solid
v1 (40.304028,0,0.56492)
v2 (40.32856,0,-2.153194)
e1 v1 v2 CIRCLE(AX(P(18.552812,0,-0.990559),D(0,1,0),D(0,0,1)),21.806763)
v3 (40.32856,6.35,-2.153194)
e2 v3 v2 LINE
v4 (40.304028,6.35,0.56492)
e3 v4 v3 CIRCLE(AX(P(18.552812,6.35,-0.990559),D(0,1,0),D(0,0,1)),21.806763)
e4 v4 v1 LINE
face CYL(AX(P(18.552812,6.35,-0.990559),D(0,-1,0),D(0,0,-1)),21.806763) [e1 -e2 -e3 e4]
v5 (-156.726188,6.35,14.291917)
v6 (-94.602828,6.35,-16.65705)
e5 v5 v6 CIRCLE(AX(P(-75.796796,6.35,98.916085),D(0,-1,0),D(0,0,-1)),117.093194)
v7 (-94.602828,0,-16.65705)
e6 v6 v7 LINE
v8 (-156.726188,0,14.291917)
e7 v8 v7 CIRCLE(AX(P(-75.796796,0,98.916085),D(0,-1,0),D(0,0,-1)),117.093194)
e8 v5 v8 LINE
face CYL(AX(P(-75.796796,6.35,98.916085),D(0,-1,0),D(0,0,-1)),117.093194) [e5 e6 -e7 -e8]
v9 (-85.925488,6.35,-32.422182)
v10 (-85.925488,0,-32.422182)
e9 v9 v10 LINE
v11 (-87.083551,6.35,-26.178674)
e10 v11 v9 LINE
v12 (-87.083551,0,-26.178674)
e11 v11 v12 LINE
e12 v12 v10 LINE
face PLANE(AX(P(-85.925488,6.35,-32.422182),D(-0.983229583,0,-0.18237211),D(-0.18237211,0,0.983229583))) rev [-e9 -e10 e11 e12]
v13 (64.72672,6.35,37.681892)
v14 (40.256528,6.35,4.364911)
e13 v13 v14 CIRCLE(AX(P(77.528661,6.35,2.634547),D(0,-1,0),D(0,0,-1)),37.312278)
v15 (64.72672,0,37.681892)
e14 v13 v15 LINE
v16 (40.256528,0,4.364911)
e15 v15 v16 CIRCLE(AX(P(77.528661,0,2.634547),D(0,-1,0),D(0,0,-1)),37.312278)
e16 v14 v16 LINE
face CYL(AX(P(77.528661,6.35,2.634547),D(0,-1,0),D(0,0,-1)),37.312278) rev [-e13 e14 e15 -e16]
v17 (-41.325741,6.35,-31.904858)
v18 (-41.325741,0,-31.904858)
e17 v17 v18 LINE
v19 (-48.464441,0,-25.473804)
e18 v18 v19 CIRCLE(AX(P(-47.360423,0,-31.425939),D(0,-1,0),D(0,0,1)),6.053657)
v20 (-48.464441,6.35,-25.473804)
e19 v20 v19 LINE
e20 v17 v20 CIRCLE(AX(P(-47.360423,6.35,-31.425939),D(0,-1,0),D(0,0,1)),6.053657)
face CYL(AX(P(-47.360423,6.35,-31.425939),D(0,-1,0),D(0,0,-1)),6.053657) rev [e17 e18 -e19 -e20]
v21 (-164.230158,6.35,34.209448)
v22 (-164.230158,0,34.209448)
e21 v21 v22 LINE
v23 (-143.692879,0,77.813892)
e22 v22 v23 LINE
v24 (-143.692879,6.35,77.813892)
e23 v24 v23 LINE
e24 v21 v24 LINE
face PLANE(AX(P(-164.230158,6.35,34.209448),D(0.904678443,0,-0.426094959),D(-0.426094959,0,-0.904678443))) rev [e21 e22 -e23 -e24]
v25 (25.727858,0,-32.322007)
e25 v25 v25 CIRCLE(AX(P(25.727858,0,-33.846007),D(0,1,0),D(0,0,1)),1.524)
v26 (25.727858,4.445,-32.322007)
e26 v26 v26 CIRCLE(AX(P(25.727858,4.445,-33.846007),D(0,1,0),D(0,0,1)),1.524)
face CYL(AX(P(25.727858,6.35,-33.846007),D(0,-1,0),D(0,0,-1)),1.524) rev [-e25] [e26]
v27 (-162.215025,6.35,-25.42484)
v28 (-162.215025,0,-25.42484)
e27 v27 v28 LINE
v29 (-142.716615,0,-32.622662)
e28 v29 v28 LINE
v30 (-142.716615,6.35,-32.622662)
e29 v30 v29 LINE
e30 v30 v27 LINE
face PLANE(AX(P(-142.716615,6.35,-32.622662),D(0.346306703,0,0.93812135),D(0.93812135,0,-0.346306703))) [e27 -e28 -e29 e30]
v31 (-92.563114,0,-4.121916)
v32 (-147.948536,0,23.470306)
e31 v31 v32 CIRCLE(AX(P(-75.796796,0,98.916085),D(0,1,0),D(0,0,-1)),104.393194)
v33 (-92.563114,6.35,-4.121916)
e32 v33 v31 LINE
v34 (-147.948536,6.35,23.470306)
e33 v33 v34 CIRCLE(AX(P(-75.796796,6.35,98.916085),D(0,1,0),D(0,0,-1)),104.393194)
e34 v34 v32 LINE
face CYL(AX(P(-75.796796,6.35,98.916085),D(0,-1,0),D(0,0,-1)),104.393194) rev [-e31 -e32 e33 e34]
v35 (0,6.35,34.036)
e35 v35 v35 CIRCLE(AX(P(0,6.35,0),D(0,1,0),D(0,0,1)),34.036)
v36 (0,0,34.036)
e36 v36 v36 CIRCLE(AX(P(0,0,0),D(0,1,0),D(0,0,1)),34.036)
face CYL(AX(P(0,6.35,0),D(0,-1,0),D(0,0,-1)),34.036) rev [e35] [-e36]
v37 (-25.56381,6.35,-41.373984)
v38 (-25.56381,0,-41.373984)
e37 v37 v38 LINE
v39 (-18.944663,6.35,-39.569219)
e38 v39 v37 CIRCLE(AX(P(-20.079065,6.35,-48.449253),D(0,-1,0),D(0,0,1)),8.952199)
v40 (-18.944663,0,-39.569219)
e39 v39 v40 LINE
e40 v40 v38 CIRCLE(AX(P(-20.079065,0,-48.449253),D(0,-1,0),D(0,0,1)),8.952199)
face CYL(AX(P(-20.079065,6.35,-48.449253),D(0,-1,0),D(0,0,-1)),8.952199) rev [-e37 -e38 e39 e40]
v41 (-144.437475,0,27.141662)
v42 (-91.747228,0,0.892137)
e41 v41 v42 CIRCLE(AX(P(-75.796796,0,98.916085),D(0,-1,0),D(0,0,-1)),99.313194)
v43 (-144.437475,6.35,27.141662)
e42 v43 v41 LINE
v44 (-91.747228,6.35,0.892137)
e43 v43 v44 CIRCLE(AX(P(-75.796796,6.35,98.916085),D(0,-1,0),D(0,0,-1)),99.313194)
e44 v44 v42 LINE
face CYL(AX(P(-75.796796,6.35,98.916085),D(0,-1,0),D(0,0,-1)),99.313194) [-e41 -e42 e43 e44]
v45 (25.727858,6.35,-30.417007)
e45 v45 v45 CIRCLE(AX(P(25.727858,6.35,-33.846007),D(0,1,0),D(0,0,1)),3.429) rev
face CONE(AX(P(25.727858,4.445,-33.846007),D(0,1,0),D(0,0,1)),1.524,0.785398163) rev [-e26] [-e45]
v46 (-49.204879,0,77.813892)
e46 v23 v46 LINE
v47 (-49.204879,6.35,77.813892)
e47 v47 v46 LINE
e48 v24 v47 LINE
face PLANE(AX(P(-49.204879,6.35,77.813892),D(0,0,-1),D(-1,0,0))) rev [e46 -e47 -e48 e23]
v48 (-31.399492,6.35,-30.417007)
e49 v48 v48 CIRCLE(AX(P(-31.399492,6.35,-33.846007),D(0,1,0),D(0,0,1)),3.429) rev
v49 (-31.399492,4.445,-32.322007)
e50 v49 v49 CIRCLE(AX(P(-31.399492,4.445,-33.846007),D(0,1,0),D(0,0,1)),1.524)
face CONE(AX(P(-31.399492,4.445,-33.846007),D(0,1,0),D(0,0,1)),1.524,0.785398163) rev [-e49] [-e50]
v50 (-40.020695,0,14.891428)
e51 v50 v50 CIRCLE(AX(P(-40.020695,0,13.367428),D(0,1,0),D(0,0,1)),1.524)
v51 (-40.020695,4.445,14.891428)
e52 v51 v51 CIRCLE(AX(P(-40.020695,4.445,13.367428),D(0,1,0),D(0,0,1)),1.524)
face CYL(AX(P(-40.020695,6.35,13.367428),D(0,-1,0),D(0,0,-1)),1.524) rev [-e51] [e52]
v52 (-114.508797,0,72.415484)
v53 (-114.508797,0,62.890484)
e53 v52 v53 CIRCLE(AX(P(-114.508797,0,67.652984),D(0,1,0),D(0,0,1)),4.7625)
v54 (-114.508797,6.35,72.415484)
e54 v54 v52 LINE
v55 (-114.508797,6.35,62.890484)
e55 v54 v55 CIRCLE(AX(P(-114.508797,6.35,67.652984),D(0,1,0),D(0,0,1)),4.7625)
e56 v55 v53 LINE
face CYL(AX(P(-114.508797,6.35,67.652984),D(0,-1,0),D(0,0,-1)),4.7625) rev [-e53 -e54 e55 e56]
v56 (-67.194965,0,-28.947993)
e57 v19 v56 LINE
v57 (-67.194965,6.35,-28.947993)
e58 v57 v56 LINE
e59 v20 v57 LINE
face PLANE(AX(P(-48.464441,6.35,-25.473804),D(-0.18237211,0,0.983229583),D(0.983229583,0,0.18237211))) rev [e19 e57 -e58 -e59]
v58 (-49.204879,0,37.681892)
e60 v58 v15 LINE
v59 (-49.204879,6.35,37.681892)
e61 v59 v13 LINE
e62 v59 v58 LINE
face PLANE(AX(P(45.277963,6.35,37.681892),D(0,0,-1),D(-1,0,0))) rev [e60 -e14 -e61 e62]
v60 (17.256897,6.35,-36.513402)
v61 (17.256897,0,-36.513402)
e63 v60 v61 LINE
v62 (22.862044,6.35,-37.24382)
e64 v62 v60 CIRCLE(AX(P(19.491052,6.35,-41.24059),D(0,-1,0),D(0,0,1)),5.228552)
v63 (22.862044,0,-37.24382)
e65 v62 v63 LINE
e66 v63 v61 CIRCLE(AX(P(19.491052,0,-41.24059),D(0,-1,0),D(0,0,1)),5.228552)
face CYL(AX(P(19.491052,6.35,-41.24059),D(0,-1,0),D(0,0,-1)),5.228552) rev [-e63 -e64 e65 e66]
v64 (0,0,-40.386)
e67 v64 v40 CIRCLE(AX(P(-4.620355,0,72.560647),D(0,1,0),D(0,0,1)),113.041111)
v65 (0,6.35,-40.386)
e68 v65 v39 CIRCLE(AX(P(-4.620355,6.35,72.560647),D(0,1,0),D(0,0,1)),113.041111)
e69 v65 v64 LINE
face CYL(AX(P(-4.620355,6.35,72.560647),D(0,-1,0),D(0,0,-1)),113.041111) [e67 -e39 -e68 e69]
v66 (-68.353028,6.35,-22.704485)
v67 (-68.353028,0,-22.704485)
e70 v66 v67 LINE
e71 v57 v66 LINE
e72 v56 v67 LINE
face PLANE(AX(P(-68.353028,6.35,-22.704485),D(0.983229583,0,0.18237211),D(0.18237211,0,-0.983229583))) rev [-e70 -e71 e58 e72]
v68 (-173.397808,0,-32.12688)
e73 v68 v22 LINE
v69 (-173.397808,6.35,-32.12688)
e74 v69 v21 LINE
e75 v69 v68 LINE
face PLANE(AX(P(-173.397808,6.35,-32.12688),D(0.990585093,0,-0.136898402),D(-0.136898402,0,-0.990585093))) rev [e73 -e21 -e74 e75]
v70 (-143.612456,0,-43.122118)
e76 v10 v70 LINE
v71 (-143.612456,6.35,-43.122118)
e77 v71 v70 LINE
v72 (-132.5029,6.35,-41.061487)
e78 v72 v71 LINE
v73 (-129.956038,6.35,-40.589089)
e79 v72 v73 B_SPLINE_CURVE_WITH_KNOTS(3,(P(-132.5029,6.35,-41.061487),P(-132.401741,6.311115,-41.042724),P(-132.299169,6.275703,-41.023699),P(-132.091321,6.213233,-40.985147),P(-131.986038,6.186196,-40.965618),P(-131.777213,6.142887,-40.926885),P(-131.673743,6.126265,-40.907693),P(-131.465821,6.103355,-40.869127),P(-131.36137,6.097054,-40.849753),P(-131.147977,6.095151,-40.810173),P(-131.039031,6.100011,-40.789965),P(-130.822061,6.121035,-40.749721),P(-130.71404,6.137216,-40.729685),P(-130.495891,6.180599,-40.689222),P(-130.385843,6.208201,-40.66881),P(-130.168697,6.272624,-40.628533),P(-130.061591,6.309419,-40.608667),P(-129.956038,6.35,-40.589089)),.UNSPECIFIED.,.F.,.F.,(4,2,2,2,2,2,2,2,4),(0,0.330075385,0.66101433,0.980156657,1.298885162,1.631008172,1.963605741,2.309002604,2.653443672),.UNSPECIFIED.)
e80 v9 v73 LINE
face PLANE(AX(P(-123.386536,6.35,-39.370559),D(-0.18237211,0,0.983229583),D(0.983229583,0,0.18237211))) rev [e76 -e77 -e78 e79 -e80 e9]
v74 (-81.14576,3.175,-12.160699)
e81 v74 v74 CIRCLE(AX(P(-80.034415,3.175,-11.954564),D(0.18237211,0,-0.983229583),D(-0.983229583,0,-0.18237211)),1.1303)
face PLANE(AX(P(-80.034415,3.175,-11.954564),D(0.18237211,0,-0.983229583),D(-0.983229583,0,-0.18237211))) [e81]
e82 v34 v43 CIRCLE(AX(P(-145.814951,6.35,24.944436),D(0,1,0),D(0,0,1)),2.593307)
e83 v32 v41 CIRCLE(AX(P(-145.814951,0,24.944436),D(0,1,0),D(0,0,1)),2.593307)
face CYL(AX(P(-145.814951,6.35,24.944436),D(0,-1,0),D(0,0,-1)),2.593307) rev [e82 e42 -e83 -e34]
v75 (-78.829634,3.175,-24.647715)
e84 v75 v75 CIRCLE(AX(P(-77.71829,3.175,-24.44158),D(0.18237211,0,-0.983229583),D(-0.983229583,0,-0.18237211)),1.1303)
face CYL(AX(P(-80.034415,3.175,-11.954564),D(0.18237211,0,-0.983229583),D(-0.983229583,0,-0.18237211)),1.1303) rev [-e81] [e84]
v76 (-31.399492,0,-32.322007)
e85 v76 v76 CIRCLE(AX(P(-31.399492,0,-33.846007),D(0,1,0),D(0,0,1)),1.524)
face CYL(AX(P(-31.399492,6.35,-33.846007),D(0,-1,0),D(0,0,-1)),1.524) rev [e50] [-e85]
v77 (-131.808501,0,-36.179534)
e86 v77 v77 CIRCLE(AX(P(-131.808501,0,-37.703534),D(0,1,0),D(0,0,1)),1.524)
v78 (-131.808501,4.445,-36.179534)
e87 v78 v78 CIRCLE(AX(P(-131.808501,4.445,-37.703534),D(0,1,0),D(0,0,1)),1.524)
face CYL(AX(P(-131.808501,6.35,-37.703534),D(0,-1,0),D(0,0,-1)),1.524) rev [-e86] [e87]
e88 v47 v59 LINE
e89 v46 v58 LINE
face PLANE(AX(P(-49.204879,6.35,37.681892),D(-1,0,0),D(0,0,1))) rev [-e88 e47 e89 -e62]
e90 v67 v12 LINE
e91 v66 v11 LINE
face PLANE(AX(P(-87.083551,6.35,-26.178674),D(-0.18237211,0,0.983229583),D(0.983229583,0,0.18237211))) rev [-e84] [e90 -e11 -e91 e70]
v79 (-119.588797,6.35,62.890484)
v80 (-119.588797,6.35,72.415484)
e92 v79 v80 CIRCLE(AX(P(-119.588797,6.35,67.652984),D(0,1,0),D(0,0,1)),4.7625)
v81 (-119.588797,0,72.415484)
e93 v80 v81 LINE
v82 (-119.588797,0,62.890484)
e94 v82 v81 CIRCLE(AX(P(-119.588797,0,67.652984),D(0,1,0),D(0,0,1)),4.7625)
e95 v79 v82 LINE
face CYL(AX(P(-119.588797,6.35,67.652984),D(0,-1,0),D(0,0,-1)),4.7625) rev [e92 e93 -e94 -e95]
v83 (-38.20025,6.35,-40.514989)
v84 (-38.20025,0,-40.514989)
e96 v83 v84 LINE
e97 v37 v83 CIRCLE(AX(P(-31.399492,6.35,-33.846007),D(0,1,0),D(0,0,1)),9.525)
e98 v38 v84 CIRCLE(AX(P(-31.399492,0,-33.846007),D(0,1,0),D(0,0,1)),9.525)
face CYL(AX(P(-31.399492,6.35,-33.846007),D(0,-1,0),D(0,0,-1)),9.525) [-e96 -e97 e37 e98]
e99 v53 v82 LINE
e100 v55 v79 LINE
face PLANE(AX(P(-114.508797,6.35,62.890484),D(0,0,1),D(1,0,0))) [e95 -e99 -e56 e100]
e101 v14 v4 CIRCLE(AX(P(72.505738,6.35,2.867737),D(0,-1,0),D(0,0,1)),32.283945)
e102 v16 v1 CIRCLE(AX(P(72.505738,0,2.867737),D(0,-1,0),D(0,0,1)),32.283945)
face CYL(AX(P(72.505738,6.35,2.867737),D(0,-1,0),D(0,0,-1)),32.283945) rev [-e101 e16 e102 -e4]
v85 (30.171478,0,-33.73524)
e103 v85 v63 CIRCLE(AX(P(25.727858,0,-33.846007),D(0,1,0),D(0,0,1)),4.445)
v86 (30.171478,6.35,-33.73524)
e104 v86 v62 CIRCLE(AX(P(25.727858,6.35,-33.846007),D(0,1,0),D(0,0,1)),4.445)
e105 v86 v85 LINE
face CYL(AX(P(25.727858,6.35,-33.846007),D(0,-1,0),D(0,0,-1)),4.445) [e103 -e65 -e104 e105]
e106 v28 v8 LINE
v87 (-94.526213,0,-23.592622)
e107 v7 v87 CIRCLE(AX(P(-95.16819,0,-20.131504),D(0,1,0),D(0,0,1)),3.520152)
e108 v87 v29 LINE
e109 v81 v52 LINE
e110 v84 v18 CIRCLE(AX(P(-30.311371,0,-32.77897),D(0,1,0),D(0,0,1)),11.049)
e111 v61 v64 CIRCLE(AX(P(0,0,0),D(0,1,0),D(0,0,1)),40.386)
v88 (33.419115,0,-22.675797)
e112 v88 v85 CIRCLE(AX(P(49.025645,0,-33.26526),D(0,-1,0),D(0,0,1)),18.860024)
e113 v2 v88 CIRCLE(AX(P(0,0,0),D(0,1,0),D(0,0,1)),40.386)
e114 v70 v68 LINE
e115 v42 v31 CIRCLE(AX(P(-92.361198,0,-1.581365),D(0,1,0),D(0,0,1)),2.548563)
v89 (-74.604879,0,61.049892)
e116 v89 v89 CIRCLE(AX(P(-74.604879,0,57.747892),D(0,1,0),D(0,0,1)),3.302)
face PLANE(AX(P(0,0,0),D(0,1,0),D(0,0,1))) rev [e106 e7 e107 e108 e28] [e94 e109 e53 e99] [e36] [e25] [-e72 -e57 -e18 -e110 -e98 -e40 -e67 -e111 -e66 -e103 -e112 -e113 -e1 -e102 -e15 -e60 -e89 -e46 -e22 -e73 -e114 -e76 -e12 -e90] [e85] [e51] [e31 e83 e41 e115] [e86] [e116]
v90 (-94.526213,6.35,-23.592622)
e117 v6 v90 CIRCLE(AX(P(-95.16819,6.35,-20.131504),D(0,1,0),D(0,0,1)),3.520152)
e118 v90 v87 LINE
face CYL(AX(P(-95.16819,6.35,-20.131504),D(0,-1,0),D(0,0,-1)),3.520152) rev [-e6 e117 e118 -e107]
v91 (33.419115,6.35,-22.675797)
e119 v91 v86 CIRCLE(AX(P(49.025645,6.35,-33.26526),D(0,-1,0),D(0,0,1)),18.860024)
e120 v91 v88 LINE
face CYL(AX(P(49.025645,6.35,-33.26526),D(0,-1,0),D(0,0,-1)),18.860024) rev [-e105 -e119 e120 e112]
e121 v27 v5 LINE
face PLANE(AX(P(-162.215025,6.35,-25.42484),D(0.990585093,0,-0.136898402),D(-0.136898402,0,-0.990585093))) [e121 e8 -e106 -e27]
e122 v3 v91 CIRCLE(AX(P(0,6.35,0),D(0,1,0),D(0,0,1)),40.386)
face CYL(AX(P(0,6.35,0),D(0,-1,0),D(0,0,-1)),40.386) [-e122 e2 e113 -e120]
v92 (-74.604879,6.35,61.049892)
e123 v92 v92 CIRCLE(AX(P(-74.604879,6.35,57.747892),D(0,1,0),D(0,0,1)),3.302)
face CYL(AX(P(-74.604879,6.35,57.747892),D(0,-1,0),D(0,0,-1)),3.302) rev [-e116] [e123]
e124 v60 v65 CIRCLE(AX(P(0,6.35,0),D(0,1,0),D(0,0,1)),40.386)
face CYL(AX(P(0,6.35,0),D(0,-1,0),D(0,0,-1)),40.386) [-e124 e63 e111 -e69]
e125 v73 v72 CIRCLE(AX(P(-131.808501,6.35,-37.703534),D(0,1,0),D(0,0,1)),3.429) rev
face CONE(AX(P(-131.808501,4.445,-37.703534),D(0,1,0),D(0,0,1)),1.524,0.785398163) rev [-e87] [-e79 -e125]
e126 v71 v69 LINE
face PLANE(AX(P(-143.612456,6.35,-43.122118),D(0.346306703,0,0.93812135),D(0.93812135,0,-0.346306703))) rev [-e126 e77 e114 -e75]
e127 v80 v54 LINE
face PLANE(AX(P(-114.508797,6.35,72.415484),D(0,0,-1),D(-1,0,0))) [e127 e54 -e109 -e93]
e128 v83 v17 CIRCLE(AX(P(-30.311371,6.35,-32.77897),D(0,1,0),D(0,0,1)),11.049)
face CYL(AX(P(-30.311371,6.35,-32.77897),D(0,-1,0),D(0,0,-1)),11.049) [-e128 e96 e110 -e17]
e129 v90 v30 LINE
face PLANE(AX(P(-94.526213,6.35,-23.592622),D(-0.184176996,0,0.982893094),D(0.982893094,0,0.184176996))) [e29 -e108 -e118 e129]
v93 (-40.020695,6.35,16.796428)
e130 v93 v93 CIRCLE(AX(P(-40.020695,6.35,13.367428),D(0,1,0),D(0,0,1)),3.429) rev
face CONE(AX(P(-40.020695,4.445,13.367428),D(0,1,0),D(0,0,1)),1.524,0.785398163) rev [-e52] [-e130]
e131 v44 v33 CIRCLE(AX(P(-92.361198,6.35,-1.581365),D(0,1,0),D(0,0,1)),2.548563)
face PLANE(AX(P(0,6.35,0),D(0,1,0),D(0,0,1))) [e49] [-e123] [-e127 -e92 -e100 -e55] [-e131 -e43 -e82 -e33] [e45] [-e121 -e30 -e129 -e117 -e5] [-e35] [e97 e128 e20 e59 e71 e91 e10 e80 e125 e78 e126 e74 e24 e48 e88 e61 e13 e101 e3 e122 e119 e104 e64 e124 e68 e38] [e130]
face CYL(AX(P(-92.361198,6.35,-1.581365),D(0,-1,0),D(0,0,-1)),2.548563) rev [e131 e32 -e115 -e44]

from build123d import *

# Parameters (mm, degrees)
SKETCH1_R           = 34.036
SKETCH1_R_2         = 1.524
SKETCH1_R_3         = 3.302
BOSS_EXTRUDE1_DEPTH = 6.35
CHAMFER1_SIZE       = 1.905
SKETCH2_R           = 1.1303
CUT_EXTRUDE1_DEPTH  = 12.7


with BuildPart() as part:
    # Sketch1 → Boss-Extrude1 (new body)
    with BuildSketch(Plane(origin=(0, 0, 0), x_dir=(1, 0, 0), z_dir=(0, 1, 0))):
        with BuildLine():
            Line((-48.464441263, 25.473804408), (-67.194964824, 28.947993109))
            Line((-67.194964824, 28.947993109), (-68.353027724, 22.704485256))
            Line((-68.353027724, 22.704485256), (-87.083551285, 26.178673957))
            Line((-87.083551285, 26.178673957), (-85.925488385, 32.42218181))
            Line((-85.925488385, 32.42218181), (-104.656011946, 35.896370512))
            Line((-104.656011946, 35.896370512), (-123.386535507, 39.370559213))
            Line((-123.386535507, 39.370559213), (-143.61245558, 43.122118146))
            Line((-143.61245558, 43.122118146), (-173.397808446, 32.12688033))
            Line((-173.397808446, 32.12688033), (-164.230158466, -34.209448348))
            Line((-164.230158466, -34.209448348), (-143.692879271, -77.813892282))
            Line((-143.692879271, -77.813892282), (-76.563330949, -77.813892282))
            Line((-76.563330949, -77.813892282), (-49.204879271, -77.813892282))
            Line((-49.204879271, -77.813892282), (-49.204879271, -37.681892282))
            Line((-49.204879271, -37.681892282), (45.277962712, -37.681892282))
            Line((45.277962712, -37.681892282), (64.72671994, -37.681892282))
            ThreePointArc((64.72671994, -37.681892282), (47.456106683, -24.721818432), (40.256527969, -4.364911427))
            ThreePointArc((40.256527969, -4.364911427), (40.224315343, -2.464216219), (40.304028245, -0.564920092))
            ThreePointArc((40.304028245, -0.564920092), (40.358687129, 0.79375425), (40.328560009, 2.153193811))
            ThreePointArc((40.328560009, 2.153193811), (38.274981353, 12.886225143), (33.41911498, 22.675796567))
            ThreePointArc((33.41911498, 22.675796567), (30.929713329, 27.951337515), (30.171477502, 33.73524029))
            ThreePointArc((30.171477502, 33.73524029), (27.651370412, 37.853265988), (22.862043617, 37.243820127))
            ThreePointArc((22.862043617, 37.243820127), (20.166682607, 36.055874133), (17.256896531, 36.513401897))
            ThreePointArc((17.256896531, 36.513401897), (8.843040964, 39.405959226), (0, 40.386))
            ThreePointArc((0, 40.386), (-9.489488111, 40.375548652), (-18.94466273, 39.569219451))
            ThreePointArc((-18.94466273, 39.569219451), (-22.43398811, 39.812343861), (-25.563809609, 41.373983535))
            ThreePointArc((-25.563809609, 41.373983535), (-32.045487778, 43.349075748), (-38.20024979, 40.514989348))
            ThreePointArc((-38.20024979, 40.514989348), (-40.697264896, 36.549064779), (-41.325740518, 31.904857578))
            ThreePointArc((-41.325740518, 31.904857578), (-43.308574881, 26.928241056), (-48.464441263, 25.473804408))
        make_face()
        with Locations(Location((0, 0, 0), (0, 0, 270))):
            Circle(SKETCH1_R, mode=Mode.SUBTRACT)
        with Locations(Location((-31.399492492, 33.846007028, 0), (0, 0, 270))):
            Circle(SKETCH1_R_2, mode=Mode.SUBTRACT)
        with Locations(Location((-74.604879271, -57.747892282, 0), (0, 0, 270))):
            Circle(SKETCH1_R_3, mode=Mode.SUBTRACT)
        with Locations(Location((-40.020695033, -13.367428306, 0), (0, 0, 270))):
            Circle(SKETCH1_R_2, mode=Mode.SUBTRACT)
        with Locations(Location((-131.808500509, 37.703534036, 0), (0, 0, 270))):
            Circle(SKETCH1_R_2, mode=Mode.SUBTRACT)
        with Locations(Location((25.727857837, 33.846007028, 0), (0, 0, 270))):
            Circle(SKETCH1_R_2, mode=Mode.SUBTRACT)
        with BuildLine():
            Line((-142.716614997, 32.622661546), (-162.215024971, 25.424839997))
            Line((-162.215024971, 25.424839997), (-156.726187502, -14.291916989))
            ThreePointArc((-156.726187502, -14.291916989), (-128.010283659, 5.891204619), (-94.602827713, 16.657049623))
            ThreePointArc((-94.602827713, 16.657049623), (-91.648252867, 20.09262068), (-94.526212577, 23.592621954))
            Line((-94.526212577, 23.592621954), (-142.716614997, 32.622661546))
        make_face(mode=Mode.SUBTRACT)
        with BuildLine():
            Line((-114.508797405, -72.415483536), (-119.588797405, -72.415483536))
            ThreePointArc((-119.588797405, -72.415483536), (-124.351297405, -67.652983536), (-119.588797405, -62.890483536))
            Line((-119.588797405, -62.890483536), (-114.508797405, -62.890483536))
            ThreePointArc((-114.508797405, -62.890483536), (-109.746297405, -67.652983536), (-114.508797405, -72.415483536))
        make_face(mode=Mode.SUBTRACT)
        with BuildLine():
            ThreePointArc((-147.948535824, -23.470306336), (-122.347176599, -5.47625853), (-92.563113904, 4.121916294))
            ThreePointArc((-92.563113904, 4.121916294), (-89.845720269, 1.990682905), (-91.74722838, -0.892137038))
            ThreePointArc((-91.74722838, -0.892137038), (-120.081933775, -10.023243789), (-144.437475152, -27.141662075))
            ThreePointArc((-144.437475152, -27.141662075), (-147.689154448, -26.736809805), (-147.948535824, -23.470306336))
        make_face(mode=Mode.SUBTRACT)
    extrude(amount=BOSS_EXTRUDE1_DEPTH)

    # Chamfer1
    # the kernel refuses this chamfer: 1.905 mm, written as the material it takes off along each edge
    with BuildSketch(Plane(origin=(-40.020695033, 6.35, 13.367428306), x_dir=(0, 0, 1), z_dir=(-1, 0, 0))) as chamfer1_piece_1:
        Polygon((1.524 + CHAMFER1_SIZE, 0), (1.524, -CHAMFER1_SIZE), (1.524, 0), align=None)
    revolve(axis=Axis((-40.020695033, 6.35, 13.367428306), (0, 1, 0)), mode=Mode.SUBTRACT)
    with BuildSketch(Plane(origin=(-131.808500509, 6.35, -37.703534036), x_dir=(0, 0, 1), z_dir=(-1, 0, 0))) as chamfer1_piece_2:
        Polygon((1.524 + CHAMFER1_SIZE, 0), (1.524, -CHAMFER1_SIZE), (1.524, 0), align=None)
    revolve(axis=Axis((-131.808500509, 6.35, -37.703534036), (0, 1, 0)), mode=Mode.SUBTRACT)
    with BuildSketch(Plane(origin=(25.727857837, 6.35, -33.846007028), x_dir=(0, 0, 1), z_dir=(-1, 0, 0))) as chamfer1_piece_3:
        Polygon((1.524 + CHAMFER1_SIZE, 0), (1.524, -CHAMFER1_SIZE), (1.524, 0), align=None)
    revolve(axis=Axis((25.727857837, 6.35, -33.846007028), (0, 1, 0)), mode=Mode.SUBTRACT)
    with BuildSketch(Plane(origin=(-31.399492492, 6.35, -33.846007028), x_dir=(0, 0, 1), z_dir=(-1, 0, 0))) as chamfer1_piece_4:
        Polygon((1.524 + CHAMFER1_SIZE, 0), (1.524, -CHAMFER1_SIZE), (1.524, 0), align=None)
    revolve(axis=Axis((-31.399492492, 6.35, -33.846007028), (0, 1, 0)), mode=Mode.SUBTRACT)

    # Sketch2 → Cut-Extrude1 (cut)
    with BuildSketch(Plane(origin=(1.797830768, 0, -9.692712298), x_dir=(-0.9832295832535878, 0, -0.18237211029917974), z_dir=(0.18237211029917974, 0, -0.9832295832535878))):
        with Locations((80.872383853, 3.175)):
            Circle(SKETCH2_R)
    extrude(amount=-CUT_EXTRUDE1_DEPTH, mode=Mode.SUBTRACT)


solid = part.part
